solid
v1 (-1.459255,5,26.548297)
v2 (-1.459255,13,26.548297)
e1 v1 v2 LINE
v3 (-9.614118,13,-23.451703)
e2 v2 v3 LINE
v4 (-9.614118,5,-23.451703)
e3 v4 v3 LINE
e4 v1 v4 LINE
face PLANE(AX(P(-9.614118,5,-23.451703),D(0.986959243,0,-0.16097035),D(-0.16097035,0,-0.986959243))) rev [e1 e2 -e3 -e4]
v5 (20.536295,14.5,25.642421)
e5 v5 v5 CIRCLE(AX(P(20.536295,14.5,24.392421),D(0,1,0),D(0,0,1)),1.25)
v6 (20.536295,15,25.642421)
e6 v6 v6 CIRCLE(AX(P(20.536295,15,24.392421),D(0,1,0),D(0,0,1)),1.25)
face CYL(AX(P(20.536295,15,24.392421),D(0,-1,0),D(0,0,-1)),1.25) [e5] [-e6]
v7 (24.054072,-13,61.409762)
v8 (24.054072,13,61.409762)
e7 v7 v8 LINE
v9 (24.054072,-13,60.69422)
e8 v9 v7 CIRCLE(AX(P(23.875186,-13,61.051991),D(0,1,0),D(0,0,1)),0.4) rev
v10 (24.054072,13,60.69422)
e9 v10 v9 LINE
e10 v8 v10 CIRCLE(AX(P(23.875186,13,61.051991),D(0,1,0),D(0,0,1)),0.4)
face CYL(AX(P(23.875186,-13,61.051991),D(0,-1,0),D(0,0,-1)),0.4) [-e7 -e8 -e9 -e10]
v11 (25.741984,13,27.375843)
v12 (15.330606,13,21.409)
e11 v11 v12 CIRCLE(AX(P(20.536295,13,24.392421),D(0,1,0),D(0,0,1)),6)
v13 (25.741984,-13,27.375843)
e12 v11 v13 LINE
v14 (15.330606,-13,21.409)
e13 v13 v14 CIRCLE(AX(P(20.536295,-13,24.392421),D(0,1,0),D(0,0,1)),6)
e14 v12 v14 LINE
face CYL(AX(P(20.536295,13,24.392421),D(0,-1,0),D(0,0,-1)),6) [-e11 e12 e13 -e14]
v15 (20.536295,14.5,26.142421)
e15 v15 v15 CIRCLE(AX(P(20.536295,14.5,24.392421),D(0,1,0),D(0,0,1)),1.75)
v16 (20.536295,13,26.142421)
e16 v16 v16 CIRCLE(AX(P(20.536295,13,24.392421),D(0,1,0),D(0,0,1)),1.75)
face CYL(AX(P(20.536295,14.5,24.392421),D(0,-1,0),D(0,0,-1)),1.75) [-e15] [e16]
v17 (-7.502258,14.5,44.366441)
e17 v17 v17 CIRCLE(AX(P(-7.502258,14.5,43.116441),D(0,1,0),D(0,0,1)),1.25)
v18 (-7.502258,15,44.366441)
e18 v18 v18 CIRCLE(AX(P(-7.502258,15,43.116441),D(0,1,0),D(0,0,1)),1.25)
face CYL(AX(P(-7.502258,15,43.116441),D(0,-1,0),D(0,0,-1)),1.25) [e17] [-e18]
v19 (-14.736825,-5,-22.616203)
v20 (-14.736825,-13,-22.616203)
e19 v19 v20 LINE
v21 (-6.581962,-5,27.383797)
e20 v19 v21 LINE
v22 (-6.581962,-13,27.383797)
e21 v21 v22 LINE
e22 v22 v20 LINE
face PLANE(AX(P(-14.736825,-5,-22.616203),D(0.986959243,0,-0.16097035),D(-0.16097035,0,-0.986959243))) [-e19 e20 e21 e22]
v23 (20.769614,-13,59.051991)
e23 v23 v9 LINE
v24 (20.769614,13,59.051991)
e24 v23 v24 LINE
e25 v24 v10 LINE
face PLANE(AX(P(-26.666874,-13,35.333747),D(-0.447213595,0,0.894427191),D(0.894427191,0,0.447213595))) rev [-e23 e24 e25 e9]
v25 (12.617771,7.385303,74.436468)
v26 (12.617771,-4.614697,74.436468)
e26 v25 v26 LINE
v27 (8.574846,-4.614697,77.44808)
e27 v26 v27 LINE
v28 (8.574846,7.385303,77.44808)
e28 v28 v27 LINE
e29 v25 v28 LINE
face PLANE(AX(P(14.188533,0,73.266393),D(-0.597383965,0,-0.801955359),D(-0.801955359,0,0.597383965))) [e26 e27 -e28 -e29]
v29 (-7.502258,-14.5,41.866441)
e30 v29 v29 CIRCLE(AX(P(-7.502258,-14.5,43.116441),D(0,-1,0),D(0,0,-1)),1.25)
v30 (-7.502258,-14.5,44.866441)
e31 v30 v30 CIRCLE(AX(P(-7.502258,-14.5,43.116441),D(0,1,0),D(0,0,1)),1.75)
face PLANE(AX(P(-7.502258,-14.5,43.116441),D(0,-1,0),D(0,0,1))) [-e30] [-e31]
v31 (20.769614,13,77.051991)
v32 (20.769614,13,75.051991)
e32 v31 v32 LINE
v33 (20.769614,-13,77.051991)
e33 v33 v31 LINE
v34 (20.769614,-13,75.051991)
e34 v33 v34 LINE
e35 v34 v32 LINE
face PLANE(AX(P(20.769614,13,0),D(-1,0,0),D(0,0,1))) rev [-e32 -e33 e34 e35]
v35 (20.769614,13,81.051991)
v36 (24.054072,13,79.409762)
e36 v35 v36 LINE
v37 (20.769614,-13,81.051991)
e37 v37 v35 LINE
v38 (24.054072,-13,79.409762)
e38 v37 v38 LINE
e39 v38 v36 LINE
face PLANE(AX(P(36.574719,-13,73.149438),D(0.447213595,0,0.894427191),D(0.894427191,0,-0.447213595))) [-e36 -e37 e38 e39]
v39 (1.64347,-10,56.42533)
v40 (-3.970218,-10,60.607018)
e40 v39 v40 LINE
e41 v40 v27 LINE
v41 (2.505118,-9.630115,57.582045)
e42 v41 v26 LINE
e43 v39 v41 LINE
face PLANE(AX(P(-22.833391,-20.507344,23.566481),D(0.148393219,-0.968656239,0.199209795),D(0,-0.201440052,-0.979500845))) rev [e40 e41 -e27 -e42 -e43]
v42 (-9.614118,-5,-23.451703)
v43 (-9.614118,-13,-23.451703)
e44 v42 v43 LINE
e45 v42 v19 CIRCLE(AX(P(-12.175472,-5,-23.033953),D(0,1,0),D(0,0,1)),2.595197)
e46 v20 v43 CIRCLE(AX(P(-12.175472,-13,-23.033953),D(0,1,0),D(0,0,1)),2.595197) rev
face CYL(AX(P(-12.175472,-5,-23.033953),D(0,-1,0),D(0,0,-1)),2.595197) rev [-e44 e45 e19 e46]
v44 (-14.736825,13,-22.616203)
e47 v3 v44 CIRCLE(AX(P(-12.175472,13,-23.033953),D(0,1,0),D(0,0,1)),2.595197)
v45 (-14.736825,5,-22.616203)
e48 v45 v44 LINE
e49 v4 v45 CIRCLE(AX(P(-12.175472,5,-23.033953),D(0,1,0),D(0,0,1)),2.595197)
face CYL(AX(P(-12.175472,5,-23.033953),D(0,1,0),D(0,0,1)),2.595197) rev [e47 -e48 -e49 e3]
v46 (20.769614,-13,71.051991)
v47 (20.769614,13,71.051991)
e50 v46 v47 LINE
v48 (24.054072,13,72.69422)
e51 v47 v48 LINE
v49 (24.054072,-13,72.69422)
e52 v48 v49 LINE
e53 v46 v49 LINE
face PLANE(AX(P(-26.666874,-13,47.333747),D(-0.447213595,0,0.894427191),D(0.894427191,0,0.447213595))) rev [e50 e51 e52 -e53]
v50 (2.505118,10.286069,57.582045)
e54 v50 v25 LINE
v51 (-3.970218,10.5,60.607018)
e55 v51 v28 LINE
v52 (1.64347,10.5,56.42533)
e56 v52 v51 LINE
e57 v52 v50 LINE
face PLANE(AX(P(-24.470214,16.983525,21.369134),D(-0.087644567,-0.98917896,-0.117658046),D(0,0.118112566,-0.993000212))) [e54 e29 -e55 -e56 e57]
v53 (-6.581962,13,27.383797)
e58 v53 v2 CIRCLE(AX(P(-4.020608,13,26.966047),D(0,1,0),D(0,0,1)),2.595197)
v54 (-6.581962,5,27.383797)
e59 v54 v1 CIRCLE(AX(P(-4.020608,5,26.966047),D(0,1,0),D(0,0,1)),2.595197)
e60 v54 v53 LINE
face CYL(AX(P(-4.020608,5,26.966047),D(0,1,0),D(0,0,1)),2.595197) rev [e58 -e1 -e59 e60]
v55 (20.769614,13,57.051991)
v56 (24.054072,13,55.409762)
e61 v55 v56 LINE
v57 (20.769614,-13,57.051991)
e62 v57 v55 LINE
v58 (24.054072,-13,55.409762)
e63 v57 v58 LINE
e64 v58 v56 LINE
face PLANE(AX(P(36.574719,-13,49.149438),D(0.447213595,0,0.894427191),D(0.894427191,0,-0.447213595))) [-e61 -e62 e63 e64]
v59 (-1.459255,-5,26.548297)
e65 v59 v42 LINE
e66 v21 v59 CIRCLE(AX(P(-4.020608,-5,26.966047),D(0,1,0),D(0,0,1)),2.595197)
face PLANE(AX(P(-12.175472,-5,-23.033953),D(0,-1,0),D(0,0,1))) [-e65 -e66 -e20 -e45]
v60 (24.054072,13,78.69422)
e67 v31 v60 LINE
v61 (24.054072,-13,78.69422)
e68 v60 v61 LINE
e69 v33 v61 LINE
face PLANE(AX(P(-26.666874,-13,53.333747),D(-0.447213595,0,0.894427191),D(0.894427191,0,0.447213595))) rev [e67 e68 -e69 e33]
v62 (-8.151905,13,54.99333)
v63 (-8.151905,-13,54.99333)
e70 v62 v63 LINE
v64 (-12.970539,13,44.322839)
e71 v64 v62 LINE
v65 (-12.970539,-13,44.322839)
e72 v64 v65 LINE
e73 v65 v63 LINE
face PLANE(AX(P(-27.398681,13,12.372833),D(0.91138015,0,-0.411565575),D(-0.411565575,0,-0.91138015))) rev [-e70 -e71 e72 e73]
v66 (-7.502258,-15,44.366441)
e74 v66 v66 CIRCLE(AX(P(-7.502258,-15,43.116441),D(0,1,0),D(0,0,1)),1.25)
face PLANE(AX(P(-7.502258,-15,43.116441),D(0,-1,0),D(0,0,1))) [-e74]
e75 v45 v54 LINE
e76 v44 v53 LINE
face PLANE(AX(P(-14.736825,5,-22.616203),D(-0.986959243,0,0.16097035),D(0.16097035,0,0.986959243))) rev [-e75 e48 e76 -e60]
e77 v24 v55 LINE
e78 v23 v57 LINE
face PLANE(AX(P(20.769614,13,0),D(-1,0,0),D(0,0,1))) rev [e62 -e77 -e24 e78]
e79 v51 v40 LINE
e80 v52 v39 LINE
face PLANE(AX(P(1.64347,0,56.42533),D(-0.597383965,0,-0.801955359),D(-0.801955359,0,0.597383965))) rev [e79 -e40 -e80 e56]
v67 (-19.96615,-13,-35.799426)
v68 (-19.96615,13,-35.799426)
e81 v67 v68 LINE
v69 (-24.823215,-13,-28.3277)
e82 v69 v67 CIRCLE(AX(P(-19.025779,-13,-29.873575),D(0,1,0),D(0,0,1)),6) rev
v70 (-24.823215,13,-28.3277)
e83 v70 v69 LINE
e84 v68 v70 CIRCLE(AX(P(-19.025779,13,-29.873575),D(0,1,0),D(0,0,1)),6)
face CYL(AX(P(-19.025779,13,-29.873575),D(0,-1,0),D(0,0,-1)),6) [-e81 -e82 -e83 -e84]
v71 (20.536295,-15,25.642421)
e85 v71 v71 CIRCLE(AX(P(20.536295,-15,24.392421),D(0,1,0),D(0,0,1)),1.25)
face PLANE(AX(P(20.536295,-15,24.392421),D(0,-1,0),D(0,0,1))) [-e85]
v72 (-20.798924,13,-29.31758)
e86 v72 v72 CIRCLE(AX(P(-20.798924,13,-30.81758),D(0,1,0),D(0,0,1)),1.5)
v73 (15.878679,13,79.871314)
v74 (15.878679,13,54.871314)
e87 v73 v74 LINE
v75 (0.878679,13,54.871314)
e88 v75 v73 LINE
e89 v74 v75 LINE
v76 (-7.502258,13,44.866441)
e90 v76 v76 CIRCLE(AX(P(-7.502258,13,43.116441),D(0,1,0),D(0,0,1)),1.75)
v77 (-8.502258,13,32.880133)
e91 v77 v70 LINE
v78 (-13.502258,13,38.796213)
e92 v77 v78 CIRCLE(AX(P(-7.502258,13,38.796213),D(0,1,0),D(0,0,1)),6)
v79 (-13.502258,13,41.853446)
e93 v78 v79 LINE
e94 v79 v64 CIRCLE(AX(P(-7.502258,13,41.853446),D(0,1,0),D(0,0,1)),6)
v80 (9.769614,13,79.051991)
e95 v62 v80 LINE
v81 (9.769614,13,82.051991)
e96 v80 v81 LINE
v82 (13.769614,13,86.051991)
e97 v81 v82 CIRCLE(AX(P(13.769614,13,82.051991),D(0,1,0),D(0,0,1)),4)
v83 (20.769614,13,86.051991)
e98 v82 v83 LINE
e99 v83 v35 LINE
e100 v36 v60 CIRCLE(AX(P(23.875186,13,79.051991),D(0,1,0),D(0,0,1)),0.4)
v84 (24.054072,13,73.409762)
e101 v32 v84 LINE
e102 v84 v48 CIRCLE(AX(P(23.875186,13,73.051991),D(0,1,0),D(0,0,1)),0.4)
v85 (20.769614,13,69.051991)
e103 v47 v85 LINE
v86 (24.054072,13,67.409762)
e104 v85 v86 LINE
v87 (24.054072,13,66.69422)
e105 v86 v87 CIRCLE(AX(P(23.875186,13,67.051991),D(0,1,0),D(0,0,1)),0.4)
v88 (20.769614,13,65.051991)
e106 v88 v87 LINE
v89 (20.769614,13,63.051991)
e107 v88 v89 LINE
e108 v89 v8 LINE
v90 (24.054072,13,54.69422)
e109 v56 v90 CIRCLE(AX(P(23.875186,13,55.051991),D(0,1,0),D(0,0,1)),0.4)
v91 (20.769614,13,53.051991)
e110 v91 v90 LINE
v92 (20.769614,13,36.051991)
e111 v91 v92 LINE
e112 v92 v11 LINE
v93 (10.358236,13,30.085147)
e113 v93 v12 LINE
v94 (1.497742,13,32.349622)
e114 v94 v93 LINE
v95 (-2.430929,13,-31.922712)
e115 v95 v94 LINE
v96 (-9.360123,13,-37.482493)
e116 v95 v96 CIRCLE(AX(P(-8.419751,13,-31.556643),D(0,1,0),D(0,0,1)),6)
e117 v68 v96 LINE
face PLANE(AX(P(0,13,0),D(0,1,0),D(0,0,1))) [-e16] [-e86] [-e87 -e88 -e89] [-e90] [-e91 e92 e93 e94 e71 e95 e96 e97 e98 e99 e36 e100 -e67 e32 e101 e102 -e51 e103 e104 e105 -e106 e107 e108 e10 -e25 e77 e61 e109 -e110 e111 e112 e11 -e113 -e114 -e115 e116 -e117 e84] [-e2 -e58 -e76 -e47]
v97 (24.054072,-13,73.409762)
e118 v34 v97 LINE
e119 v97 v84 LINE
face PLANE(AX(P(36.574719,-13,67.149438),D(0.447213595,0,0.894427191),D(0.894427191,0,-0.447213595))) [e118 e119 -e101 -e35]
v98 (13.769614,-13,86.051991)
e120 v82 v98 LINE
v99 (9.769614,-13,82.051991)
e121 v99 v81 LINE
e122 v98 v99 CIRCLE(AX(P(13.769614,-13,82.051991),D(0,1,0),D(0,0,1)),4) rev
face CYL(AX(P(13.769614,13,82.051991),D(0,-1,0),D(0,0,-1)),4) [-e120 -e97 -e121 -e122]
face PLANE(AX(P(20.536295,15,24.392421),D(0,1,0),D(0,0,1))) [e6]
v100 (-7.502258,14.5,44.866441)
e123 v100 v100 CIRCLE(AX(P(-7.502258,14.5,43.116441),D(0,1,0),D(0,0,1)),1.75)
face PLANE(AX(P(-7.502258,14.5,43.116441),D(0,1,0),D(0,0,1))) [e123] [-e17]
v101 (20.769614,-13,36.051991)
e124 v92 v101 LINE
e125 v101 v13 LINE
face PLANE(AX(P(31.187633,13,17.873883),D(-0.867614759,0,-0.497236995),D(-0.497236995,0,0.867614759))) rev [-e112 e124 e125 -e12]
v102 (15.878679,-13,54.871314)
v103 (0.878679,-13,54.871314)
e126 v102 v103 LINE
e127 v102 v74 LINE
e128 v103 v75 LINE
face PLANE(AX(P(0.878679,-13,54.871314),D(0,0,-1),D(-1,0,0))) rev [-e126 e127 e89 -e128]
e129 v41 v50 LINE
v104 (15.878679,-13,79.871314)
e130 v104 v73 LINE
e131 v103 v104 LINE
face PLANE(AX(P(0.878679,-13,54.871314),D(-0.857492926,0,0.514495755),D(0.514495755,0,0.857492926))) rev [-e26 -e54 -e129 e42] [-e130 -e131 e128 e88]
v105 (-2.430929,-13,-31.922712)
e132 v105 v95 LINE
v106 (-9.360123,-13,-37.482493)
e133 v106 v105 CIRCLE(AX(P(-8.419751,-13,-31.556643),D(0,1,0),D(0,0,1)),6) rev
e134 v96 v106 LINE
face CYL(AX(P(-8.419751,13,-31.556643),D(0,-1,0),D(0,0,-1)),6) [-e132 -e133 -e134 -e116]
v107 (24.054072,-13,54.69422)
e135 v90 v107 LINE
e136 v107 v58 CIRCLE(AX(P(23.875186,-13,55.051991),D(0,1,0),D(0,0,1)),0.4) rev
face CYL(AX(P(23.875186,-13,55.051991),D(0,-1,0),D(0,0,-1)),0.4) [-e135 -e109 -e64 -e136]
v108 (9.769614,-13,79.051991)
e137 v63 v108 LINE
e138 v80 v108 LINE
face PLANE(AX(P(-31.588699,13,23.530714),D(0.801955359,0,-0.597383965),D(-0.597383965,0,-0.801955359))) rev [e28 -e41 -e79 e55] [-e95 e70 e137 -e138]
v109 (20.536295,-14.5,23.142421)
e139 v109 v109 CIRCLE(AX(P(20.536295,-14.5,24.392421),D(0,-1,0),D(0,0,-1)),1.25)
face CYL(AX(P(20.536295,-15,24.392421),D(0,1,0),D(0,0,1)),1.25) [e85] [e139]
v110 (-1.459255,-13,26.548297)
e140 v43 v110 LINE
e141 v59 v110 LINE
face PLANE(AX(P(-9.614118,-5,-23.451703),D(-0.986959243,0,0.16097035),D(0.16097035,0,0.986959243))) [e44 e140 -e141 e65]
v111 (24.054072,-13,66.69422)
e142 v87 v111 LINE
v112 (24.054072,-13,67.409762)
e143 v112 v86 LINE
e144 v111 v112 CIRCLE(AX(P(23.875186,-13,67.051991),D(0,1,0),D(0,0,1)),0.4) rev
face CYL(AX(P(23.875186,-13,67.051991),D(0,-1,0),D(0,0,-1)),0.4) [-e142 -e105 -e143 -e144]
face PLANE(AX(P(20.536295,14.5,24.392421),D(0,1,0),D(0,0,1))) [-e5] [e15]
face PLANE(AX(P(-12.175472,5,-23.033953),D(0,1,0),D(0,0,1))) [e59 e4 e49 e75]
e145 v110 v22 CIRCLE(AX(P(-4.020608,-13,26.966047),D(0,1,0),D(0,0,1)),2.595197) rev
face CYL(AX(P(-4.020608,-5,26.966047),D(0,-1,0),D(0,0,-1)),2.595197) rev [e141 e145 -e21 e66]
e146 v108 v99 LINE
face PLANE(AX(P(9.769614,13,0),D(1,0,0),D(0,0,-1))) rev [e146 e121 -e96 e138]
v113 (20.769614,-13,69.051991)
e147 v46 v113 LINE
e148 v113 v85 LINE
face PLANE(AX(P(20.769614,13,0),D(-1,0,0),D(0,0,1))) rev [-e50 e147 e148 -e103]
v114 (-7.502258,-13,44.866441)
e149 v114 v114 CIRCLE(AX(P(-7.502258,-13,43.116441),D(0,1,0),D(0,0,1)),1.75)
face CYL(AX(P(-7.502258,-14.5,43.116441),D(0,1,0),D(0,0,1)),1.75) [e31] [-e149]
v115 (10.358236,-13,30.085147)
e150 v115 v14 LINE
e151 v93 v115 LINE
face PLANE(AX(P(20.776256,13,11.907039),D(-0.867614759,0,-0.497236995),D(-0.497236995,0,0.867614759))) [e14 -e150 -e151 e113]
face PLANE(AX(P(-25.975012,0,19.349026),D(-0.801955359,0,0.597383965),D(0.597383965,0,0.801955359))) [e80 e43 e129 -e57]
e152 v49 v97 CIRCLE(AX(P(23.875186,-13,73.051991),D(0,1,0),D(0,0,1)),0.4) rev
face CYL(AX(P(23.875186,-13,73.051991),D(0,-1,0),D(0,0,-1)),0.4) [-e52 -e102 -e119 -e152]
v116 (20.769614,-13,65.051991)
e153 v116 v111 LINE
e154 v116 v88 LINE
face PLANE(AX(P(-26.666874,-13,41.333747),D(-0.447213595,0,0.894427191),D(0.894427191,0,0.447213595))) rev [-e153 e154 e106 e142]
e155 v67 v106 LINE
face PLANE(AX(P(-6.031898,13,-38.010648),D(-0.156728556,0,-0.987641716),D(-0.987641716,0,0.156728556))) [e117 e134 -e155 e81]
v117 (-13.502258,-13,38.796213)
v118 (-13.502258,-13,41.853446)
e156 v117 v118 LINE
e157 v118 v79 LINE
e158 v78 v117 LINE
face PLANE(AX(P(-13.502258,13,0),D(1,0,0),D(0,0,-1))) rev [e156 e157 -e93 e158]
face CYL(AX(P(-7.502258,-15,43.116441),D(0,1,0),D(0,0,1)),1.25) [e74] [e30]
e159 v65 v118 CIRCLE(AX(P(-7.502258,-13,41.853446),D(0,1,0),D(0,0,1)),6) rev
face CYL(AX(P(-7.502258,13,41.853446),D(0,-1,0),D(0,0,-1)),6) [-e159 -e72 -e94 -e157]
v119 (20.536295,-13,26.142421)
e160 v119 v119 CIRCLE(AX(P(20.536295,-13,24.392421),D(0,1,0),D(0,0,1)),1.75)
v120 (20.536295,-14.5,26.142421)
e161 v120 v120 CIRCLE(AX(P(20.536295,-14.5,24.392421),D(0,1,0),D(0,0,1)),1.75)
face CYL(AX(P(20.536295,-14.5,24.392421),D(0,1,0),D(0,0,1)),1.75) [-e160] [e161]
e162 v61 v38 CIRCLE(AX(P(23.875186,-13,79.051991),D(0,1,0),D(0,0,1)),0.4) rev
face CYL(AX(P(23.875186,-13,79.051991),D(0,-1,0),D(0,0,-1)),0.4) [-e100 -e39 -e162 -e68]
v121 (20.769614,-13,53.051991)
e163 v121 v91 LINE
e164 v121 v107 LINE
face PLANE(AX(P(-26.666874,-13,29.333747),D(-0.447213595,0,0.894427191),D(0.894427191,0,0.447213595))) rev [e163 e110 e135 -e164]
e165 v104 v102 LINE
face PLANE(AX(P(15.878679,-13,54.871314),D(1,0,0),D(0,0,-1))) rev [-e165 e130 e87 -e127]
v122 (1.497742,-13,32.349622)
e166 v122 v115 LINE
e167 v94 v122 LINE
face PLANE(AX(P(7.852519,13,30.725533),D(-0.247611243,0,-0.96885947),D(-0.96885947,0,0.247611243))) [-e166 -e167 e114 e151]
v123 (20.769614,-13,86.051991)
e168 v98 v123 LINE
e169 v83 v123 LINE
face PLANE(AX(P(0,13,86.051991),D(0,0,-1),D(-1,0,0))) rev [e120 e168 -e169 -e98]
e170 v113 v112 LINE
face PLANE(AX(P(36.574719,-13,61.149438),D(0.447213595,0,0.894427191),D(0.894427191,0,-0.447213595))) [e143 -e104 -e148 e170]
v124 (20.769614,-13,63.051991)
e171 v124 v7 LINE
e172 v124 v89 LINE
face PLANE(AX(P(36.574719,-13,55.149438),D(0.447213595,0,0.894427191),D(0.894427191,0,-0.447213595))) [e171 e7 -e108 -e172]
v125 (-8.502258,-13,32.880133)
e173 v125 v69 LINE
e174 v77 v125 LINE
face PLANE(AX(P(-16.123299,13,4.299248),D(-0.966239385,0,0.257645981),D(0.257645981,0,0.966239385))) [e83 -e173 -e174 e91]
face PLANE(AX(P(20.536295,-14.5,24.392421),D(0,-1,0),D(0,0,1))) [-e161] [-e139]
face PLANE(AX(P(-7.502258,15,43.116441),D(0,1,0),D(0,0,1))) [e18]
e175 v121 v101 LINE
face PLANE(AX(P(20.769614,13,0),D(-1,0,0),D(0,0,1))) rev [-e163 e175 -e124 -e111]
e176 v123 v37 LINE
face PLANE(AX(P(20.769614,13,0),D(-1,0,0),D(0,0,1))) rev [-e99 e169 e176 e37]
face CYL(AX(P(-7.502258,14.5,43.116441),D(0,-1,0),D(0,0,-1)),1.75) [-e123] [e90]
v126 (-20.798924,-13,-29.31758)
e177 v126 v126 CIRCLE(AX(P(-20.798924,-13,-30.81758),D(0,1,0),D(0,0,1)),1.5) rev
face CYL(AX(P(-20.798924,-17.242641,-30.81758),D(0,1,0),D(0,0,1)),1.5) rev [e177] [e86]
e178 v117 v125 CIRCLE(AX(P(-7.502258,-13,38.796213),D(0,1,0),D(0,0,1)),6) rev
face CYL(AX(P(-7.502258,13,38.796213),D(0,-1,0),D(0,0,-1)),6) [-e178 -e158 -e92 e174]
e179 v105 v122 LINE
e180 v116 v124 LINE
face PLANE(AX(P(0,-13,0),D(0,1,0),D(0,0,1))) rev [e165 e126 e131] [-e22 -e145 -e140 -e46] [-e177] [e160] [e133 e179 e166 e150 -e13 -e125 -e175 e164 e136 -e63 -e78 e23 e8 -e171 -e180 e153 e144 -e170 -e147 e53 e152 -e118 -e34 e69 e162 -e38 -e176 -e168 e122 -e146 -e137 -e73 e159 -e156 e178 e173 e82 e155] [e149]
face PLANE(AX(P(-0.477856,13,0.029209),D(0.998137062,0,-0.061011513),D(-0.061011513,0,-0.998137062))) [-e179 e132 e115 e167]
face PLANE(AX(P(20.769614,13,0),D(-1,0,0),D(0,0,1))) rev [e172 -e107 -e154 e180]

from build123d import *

# Parameters (mm, degrees)
BOSS_EXTRUDE1_DEPTH = 13
CUT_EXTRUDE1_DEPTH  = 26
BOSS_EXTRUDE3_DEPTH = 26
LPATTERN1_COUNT     = 5
LPATTERN1_PITCH     = 6
FILLET1_R           = 6
FILLET2_R           = 0.4
FILLET3_R           = 0.4
FILLET4_R           = 0.4
FILLET5_R           = 0.4
FILLET6_R           = 0.4
FILLET7_R           = 6
FILLET8_R           = 4
SKETCH4_R           = 1.5
CUT_EXTRUDE2_DEPTH  = 26
CUT_EXTRUDE3_DEPTH  = 7
SKETCH6_R           = 1.75
BOSS_EXTRUDE4_DEPTH = 1.5
SKETCH7_R           = 1.25
BOSS_EXTRUDE5_DEPTH = 0.5
CUT_EXTRUDE7_DEPTH  = 10


with BuildPart() as part:
    # Sketch1 → Boss-Extrude1 (new, symmetric)
    with BuildSketch(Plane(origin=(0, 0, 0), x_dir=(1, 0, 0), z_dir=(0, 1, 0))):
        Polygon((-26.537476469, 34.756624027), (-8.502257827, -32.880132907), (1.497742173, -32.349622066), (-2.834075277, 38.51810936), align=None)
        with BuildLine():
            Line((20.769613605, -36.051991051), (25.741983559, -27.375843459))
            ThreePointArc((25.741983559, -27.375843459), (23.519716976, -19.186732931), (15.330606448, -21.408999514))
            Line((15.330606448, -21.408999514), (10.358236494, -30.085147107))
            Line((10.358236494, -30.085147107), (1.497742173, -32.349622066))
            Line((1.497742173, -32.349622066), (-13.502257827, -33.145388327))
            Line((-13.502257827, -33.145388327), (-13.502257827, -43.145388327))
            Line((-13.502257827, -43.145388327), (-8.151905345, -54.993330272))
            Line((-8.151905345, -54.993330272), (9.769613605, -79.051991051))
            Line((9.769613605, -79.051991051), (9.769613605, -86.051991051))
            Line((9.769613605, -86.051991051), (20.769613605, -86.051991051))
            Line((20.769613605, -86.051991051), (20.769613605, -36.051991051))
        make_face()
    extrude(amount=BOSS_EXTRUDE1_DEPTH, both=True)

    # Sketch2 → Cut-Extrude1 (cut)
    with BuildSketch(Plane(origin=(0, 13, 0), x_dir=(1, 0, 0), z_dir=(0, 1, 0))):
        Polygon((0.878679347, -54.871314491), (15.878679347, -54.871314491), (15.878679347, -79.871314491), align=None)
    extrude(amount=-CUT_EXTRUDE1_DEPTH, mode=Mode.SUBTRACT)

    # Sketch3 → Boss-Extrude3 (add)
    with BuildSketch(Plane(origin=(0, 13, 0), x_dir=(1, 0, 0), z_dir=(0, 1, 0))):
        Polygon((20.769613605, -77.051991051), (20.769613605, -79.051991051), (24.769613605, -79.051991051), align=None)
        Polygon((20.769613605, -79.051991051), (20.769613605, -81.051991051), (24.769613605, -79.051991051), align=None)
    boss_extrude3 = extrude(amount=-BOSS_EXTRUDE3_DEPTH)

    # LPattern1: Boss-Extrude3 ×5
    with Locations(*[(0, 0, -i * LPATTERN1_PITCH) for i in range(1, LPATTERN1_COUNT)]):
        add(boss_extrude3)

    # Fillet1
    fillet1_edges = [part.edges().sort_by_distance(p)[0] for p in [
        (-26.537476469, 0, -34.756624027),
        (-2.834075277, 0, -38.51810936),
    ]]
    fillet(fillet1_edges, radius=FILLET1_R)

    # Fillet2
    fillet2_edges = [part.edges().sort_by_distance(p)[0] for p in [
        (24.769613605, 0, 79.051991051),
    ]]
    fillet(fillet2_edges, radius=FILLET2_R)

    # Fillet3
    fillet3_edges = [part.edges().sort_by_distance(p)[0] for p in [
        (24.769613605, 0, 73.051991051),
    ]]
    fillet(fillet3_edges, radius=FILLET3_R)

    # Fillet4
    fillet4_edges = [part.edges().sort_by_distance(p)[0] for p in [
        (24.769613605, 0, 67.051991051),
    ]]
    fillet(fillet4_edges, radius=FILLET4_R)

    # Fillet5
    fillet5_edges = [part.edges().sort_by_distance(p)[0] for p in [
        (24.769613605, 0, 61.051991051),
    ]]
    fillet(fillet5_edges, radius=FILLET5_R)

    # Fillet6
    fillet6_edges = [part.edges().sort_by_distance(p)[0] for p in [
        (24.769613605, 0, 55.051991051),
    ]]
    fillet(fillet6_edges, radius=FILLET6_R)

    # Fillet7
    # the kernel refuses this fillet: 6 mm, written as the material it takes off along each edge
    with BuildSketch(Plane(origin=(-13.502257827, -16.229856517, 43.145388327), x_dir=(0, 0, -1), z_dir=(0, 1, 0))) as fillet7_piece_1:
        with BuildLine():
            CenterArc((FILLET7_R * 0.215323767796, -FILLET7_R), FILLET7_R, 90, 24.303219814)
            Line((-FILLET7_R * 0.196241807704, -FILLET7_R * 0.0886198504117), (-FILLET7_R * 0.204473119214, -FILLET7_R * 0.0703922474199))
            Line((-FILLET7_R * 0.204473119214, -FILLET7_R * 0.0703922474199), (-FILLET7_R * 0.00430647535592, FILLET7_R * 0.02))
            Line((-FILLET7_R * 0.00430647535592, FILLET7_R * 0.02), (FILLET7_R * 0.215323767796, FILLET7_R * 0.02))
            Line((FILLET7_R * 0.215323767796, FILLET7_R * 0.02), (FILLET7_R * 0.215323767796, 0))
        make_face()
    extrude(amount=32.459713034, mode=Mode.SUBTRACT)
    with BuildSketch(Plane(origin=(-13.502257827, -27.127060907, 33.145388327), x_dir=(0.9985957546463174, 0, -0.052976587303748185), z_dir=(0, 1, 0))) as fillet7_piece_2_section:
        with BuildLine():
            CenterArc((5.692213138, -5.960748743), FILLET7_R, 96.557311778, 80.405931773)
            Line((-0.29936139, -5.642889219), (-0.419192881, -5.636532029))
            Line((-0.419192881, -5.636532029), (-0.119831491, 0.00635719))
            Line((-0.119831491, 0.00635719), (0, 0.12))
            ThreePointArc((0, 0.12), (2.50351555, 0.12), (4.993327459, 0.119214975))
            Line((4.993327459, 0.119214975), (5.0070311, 0))
        make_face()
    fillet7_piece_2 = extrude(amount=54.254121814, mode=Mode.PRIVATE)
    fillet7_piece_2 = split(fillet7_piece_2, bisect_by=Plane(origin=(-8.382183635, 0, 33.330442332), z_dir=(-0.9662393847687492, 0, 0.25764598060460653)), keep=Keep.TOP, mode=Mode.PRIVATE)
    add(fillet7_piece_2, mode=Mode.SUBTRACT)

    # Fillet8
    fillet8_edges = [part.edges().sort_by_distance(p)[0] for p in [
        (9.769613605, 0, 86.051991051),
    ]]
    fillet(fillet8_edges, radius=FILLET8_R)

    # Sketch4 → Cut-Extrude2 (cut)
    with BuildSketch(Plane(origin=(0, 13, 0), x_dir=(1, 0, 0), z_dir=(0, 1, 0))):
        with Locations(Location((-20.798923606, 30.81758039, 0), (0, 0, 270))):
            Circle(SKETCH4_R)
    extrude(amount=-CUT_EXTRUDE2_DEPTH, mode=Mode.SUBTRACT)

    # Sketch5 → Cut-Extrude3 (cut)
    with BuildSketch(Plane(origin=(-31.588699111, 0, 23.530714154), x_dir=(0.5973839650110779, 0, 0.8019553593234747), z_dir=(-0.8019553593234747, 0, 0.5973839650110779))):
        Polygon((67.232378401, 7.385302578), (46.232378401, 10.5), (46.232378401, -10), (67.232378401, -4.614697422), align=None)
    extrude(amount=-CUT_EXTRUDE3_DEPTH, mode=Mode.SUBTRACT)

    # Sketch6 → Boss-Extrude4 (add)
    with BuildSketch(Plane(origin=(0, 13, 0), x_dir=(1, 0, 0), z_dir=(0, 1, 0))):
        with Locations(Location((20.536295004, -24.392421487, 0), (0, 0, 270))):
            Circle(SKETCH6_R)
        with Locations(Location((-7.502257827, -43.116441091, 0), (0, 0, 270))):
            Circle(SKETCH6_R)
    boss_extrude4 = extrude(amount=BOSS_EXTRUDE4_DEPTH)

    # Sketch7 → Boss-Extrude5 (add)
    with BuildSketch(Plane(origin=(0, 14.5, 0), x_dir=(1, 0, 0), z_dir=(0, 1, 0))):
        with Locations(Location((-7.502257827, -43.116441091, 0), (0, 0, 270))):
            Circle(SKETCH7_R)
        with Locations(Location((20.536295004, -24.392421487, 0), (0, 0, 270))):
            Circle(SKETCH7_R)
    boss_extrude5 = extrude(amount=BOSS_EXTRUDE5_DEPTH)

    # Sketch8 → Cut-Extrude7 (cut)
    with BuildSketch(Plane(origin=(0, 15, 0), x_dir=(1, 0, 0), z_dir=(0, 1, 0))):
        with BuildLine():
            Line((-9.614117845, 23.451702753), (-1.459254761, -26.548297247))
            ThreePointArc((-1.459254761, -26.548297247), (-3.602858696, -29.527400736), (-6.581962185, -27.3837968))
            Line((-6.581962185, -27.3837968), (-14.736825269, 22.6162032))
            ThreePointArc((-14.736825269, 22.6162032), (-12.593221334, 25.595306688), (-9.614117845, 23.451702753))
        make_face()
    cut_extrude7 = extrude(amount=-CUT_EXTRUDE7_DEPTH, mode=Mode.SUBTRACT)

    # Mirror1: Boss-Extrude4, Boss-Extrude5, Cut-Extrude7 across plane
    add(boss_extrude4.mirror(Plane.ZX))
    add(boss_extrude5.mirror(Plane.ZX))
    add(cut_extrude7.mirror(Plane.ZX), mode=Mode.SUBTRACT)


solid = part.part
